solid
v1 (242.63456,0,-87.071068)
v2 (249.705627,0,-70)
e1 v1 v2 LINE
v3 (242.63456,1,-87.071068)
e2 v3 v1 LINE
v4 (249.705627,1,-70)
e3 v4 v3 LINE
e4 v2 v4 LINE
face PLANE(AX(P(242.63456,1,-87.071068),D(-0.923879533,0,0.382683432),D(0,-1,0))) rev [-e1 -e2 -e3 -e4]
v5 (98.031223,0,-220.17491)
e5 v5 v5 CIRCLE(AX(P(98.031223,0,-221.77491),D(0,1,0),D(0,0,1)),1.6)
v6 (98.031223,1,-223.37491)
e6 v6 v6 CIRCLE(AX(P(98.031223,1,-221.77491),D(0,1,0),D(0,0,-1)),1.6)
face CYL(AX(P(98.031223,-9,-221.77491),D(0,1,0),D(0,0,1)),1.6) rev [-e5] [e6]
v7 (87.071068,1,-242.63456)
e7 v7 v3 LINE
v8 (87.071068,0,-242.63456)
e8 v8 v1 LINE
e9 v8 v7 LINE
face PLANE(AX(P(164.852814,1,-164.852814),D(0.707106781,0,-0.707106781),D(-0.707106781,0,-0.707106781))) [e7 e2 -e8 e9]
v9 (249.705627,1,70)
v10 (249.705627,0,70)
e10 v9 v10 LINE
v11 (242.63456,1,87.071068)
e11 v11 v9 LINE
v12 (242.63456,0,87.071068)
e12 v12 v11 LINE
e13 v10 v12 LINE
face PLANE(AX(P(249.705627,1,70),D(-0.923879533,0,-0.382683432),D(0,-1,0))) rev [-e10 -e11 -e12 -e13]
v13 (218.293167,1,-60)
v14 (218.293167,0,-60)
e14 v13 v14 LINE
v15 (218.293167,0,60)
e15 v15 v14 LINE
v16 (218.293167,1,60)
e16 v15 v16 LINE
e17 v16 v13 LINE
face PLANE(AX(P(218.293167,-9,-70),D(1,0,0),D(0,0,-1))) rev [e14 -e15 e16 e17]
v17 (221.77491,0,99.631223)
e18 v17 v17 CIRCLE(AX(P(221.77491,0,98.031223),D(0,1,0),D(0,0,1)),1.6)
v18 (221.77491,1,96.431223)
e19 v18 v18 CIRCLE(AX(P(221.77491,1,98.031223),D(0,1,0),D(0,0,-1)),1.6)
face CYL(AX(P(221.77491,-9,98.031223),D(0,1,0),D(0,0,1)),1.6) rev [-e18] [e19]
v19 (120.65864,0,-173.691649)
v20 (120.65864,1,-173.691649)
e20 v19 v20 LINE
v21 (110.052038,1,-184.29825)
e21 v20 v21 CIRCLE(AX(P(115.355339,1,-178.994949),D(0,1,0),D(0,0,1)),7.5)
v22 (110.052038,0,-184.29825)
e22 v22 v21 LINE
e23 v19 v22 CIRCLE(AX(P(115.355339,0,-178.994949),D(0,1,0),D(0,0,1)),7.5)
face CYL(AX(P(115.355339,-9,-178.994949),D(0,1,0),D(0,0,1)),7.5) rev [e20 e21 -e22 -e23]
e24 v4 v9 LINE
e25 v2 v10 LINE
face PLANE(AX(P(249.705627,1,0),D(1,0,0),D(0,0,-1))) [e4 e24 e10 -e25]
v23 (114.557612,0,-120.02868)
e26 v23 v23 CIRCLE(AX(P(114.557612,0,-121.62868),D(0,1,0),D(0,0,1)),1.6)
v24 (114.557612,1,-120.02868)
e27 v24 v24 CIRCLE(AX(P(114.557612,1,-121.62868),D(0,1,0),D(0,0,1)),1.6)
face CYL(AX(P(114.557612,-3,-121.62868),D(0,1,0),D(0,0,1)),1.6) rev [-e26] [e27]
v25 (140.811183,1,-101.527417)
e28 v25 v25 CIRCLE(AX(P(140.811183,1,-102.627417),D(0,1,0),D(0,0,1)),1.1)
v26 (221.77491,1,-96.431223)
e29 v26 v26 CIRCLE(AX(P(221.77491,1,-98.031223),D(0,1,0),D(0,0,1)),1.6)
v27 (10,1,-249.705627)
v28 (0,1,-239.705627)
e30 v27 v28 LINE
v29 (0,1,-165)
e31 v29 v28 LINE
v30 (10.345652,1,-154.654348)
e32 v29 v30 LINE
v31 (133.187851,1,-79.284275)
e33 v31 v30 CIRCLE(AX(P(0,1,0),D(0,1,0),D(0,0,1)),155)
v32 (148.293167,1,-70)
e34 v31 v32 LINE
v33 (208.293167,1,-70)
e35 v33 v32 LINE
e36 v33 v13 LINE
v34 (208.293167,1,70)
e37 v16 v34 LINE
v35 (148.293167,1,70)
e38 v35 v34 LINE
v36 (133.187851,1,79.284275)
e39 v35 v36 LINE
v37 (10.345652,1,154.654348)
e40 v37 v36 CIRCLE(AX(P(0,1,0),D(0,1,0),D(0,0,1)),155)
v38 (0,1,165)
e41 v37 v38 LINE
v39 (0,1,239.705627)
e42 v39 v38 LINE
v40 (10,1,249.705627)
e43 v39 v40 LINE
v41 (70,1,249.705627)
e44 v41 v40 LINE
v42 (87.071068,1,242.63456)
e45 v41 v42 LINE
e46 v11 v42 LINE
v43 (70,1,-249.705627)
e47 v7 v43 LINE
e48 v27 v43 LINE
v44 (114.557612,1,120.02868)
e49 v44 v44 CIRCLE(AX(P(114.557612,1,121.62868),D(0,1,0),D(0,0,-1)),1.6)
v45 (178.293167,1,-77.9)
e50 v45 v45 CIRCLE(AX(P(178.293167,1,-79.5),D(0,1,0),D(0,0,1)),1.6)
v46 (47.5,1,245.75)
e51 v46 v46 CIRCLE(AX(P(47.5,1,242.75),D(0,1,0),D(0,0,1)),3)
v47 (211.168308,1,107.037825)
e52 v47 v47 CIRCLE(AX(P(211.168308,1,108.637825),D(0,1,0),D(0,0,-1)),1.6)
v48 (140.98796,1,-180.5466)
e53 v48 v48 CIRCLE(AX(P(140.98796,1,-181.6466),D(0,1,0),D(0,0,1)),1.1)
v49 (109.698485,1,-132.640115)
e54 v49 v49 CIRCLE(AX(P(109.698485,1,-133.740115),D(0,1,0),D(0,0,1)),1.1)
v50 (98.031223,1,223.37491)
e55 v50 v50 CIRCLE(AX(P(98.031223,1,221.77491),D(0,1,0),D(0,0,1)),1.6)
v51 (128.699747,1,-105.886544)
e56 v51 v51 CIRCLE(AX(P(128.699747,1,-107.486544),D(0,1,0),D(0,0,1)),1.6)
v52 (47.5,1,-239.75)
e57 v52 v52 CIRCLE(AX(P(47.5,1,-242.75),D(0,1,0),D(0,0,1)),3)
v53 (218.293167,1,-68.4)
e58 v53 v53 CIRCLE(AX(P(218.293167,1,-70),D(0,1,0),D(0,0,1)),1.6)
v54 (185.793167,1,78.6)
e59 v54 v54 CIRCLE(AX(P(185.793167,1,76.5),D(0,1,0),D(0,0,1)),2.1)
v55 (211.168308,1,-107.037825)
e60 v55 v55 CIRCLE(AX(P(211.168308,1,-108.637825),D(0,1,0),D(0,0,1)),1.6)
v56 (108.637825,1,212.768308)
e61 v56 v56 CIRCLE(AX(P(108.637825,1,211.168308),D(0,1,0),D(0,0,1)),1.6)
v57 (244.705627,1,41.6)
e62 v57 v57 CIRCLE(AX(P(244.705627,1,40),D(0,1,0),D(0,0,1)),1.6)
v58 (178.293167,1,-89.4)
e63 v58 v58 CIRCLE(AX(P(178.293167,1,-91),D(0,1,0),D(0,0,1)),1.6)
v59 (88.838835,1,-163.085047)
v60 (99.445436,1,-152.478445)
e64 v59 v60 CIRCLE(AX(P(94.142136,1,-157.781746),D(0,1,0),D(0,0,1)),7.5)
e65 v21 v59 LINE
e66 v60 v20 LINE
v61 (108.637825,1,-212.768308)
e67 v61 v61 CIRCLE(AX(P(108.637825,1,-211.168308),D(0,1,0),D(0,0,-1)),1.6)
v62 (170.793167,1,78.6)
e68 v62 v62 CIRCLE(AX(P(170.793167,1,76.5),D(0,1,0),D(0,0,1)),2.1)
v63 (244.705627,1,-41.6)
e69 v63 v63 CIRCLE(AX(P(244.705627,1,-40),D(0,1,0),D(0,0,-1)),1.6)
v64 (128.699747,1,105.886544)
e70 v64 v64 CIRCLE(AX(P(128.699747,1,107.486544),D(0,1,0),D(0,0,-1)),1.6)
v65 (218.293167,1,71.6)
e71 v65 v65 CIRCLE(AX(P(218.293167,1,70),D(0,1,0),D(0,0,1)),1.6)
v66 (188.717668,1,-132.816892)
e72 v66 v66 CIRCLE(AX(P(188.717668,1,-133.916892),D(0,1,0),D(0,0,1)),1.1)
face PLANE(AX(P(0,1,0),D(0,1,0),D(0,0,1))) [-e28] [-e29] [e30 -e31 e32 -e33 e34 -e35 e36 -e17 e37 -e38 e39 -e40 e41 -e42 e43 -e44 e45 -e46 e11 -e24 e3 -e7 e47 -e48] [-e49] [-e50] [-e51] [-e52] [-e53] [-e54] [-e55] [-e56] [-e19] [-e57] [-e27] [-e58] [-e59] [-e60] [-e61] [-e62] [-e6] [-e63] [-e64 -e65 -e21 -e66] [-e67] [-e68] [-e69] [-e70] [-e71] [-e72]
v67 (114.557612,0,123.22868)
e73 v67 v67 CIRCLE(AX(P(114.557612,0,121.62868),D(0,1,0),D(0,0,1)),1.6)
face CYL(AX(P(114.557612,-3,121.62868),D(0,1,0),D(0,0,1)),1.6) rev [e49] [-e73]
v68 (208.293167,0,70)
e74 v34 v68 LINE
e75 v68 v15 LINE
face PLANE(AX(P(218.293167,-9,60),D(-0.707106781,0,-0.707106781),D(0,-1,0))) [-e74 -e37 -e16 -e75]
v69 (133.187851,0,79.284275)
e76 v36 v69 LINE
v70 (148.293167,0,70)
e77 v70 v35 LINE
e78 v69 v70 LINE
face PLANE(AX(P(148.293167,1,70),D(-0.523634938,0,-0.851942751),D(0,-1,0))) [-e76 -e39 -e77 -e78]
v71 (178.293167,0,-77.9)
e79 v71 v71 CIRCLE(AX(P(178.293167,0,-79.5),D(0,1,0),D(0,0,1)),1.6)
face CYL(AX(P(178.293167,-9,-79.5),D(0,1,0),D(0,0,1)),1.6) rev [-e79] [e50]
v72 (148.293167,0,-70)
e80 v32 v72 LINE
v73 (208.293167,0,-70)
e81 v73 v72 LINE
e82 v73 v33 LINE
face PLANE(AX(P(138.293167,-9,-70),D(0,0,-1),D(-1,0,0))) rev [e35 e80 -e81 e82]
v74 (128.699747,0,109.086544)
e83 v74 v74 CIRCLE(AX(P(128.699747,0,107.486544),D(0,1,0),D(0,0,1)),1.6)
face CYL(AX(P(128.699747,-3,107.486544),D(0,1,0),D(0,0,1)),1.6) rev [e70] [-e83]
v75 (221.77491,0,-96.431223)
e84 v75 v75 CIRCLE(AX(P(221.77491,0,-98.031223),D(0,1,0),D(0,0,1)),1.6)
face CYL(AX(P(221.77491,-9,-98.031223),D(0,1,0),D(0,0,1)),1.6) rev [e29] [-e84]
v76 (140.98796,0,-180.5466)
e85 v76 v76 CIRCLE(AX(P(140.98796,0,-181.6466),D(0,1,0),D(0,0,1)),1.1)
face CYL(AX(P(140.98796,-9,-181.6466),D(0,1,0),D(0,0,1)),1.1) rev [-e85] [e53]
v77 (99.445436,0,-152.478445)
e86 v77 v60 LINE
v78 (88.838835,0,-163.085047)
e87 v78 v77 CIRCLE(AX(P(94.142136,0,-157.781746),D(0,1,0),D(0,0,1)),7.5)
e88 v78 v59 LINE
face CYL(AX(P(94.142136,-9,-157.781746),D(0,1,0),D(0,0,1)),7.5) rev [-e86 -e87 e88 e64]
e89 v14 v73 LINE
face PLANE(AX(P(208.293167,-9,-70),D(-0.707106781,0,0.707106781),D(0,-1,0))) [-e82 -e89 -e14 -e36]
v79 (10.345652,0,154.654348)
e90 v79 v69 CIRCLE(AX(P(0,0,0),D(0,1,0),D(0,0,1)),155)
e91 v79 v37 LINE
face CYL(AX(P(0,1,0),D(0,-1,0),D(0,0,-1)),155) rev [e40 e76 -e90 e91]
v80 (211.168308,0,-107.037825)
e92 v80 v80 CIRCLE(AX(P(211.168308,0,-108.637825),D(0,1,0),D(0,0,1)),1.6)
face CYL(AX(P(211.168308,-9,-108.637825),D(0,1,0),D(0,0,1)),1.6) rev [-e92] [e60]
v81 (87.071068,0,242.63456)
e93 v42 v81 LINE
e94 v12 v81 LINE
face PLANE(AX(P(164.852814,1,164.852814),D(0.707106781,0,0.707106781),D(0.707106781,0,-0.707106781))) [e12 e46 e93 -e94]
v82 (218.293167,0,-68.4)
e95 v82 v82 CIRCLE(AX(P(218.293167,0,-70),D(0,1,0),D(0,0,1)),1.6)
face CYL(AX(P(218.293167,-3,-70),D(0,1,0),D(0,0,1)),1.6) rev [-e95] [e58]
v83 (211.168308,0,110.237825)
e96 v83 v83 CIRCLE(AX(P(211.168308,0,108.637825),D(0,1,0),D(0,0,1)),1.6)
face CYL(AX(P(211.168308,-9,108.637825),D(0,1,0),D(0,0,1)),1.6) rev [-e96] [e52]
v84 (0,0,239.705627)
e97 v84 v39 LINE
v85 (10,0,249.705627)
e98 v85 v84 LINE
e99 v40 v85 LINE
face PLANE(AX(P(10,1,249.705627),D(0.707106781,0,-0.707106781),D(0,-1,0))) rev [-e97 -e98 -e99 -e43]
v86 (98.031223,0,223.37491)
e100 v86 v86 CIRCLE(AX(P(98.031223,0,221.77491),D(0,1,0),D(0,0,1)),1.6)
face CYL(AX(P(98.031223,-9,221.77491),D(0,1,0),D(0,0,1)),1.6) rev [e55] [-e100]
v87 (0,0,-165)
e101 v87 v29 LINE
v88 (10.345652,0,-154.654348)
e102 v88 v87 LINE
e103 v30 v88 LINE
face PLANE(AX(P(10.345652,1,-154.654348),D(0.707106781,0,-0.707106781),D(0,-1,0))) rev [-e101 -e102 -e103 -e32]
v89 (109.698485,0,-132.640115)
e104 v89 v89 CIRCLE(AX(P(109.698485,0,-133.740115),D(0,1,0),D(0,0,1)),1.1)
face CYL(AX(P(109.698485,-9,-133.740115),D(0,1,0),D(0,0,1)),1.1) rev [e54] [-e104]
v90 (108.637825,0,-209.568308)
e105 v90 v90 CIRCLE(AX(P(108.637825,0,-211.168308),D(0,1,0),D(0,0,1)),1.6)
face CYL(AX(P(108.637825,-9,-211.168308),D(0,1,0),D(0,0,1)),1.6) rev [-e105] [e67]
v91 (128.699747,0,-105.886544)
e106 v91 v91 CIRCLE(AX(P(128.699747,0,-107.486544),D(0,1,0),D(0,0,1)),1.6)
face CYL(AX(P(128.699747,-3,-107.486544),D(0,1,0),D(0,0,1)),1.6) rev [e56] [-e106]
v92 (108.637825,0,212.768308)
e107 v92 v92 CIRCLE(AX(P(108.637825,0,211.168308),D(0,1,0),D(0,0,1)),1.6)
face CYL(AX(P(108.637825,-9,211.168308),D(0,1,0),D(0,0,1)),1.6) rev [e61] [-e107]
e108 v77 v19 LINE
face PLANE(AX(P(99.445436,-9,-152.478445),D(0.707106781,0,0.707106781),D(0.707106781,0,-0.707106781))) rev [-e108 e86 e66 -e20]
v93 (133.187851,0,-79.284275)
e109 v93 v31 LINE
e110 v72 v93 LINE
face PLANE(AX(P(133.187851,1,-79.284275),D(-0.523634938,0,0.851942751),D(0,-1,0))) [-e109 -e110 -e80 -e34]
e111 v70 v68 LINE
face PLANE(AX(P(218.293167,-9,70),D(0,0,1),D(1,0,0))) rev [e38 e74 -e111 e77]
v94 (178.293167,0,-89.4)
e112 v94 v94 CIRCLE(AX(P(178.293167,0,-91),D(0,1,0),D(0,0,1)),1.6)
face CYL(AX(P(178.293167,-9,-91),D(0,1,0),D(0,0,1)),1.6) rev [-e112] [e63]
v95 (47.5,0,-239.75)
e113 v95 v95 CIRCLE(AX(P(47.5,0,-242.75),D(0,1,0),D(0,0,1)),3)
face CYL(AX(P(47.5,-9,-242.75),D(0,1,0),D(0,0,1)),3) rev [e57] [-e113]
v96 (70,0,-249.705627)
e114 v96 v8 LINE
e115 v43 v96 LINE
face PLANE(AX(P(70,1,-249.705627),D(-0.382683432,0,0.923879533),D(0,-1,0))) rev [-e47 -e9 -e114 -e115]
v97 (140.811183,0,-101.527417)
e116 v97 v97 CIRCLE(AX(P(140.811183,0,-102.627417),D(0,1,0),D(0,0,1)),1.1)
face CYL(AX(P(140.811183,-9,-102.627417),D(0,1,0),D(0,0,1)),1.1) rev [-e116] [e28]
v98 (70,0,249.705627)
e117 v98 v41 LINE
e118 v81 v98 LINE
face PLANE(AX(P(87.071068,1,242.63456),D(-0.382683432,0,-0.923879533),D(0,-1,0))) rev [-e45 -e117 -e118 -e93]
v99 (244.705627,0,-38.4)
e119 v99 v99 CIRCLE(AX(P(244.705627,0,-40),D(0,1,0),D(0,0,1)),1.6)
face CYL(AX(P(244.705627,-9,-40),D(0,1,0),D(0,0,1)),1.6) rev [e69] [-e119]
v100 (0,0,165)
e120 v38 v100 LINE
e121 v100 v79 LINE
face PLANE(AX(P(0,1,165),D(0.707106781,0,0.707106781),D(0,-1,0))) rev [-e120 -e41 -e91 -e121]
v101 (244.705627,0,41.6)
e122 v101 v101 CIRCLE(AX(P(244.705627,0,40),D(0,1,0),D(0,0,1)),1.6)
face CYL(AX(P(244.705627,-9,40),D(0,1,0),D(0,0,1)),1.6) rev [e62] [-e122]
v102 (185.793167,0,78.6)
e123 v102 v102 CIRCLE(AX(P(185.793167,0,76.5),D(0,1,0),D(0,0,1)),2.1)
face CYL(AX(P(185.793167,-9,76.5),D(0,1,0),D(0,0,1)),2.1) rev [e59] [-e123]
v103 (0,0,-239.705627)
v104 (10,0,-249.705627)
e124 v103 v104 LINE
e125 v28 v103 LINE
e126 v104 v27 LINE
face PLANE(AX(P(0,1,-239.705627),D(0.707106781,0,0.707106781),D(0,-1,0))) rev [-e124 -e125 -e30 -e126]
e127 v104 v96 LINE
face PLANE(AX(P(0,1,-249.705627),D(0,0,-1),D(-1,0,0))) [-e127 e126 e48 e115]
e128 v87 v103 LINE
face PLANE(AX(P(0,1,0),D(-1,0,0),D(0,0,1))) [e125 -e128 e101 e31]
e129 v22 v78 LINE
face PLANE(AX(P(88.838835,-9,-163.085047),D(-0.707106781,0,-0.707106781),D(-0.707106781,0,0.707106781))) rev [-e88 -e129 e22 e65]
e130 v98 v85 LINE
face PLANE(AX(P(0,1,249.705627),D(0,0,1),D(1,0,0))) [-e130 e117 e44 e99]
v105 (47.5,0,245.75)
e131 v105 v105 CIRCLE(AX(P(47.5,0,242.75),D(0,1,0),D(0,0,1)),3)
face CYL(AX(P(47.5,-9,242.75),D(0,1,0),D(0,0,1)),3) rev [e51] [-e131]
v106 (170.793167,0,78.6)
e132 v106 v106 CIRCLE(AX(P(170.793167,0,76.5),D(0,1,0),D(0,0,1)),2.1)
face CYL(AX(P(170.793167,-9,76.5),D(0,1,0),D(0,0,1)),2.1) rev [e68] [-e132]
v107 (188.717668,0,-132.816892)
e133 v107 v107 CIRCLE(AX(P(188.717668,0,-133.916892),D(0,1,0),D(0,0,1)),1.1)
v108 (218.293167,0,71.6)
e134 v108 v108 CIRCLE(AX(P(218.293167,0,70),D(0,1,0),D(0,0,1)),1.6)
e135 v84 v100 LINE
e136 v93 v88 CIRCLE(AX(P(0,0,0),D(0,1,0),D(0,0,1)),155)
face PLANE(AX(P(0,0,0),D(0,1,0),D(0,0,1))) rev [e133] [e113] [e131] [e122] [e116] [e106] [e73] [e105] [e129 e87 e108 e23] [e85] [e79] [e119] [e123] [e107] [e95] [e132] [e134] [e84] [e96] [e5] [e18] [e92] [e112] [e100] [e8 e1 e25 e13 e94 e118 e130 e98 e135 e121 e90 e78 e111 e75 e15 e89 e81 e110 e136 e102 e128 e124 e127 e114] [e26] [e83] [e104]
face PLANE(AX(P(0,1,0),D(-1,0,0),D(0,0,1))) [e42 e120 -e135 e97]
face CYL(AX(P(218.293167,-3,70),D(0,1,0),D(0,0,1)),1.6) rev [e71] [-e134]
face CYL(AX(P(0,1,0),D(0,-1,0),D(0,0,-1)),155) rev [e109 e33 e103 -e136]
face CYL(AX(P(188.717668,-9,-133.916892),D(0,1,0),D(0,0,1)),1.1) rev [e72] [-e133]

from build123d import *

# Parameters (mm, degrees)
EXTRUDE_1_DEPTH     = 1
SKETCH_2_W          = 80
SKETCH_2_H          = 140
CUT_EXTRUDE_1_DEPTH = 10
CHAMFER_1_SIZE      = 10
SKETCH_3_R          = 1.6
CUT_EXTRUDE_2_DEPTH = 10
SKETCH_4_R          = 2.1
SKETCH_4_R_2        = 1.6
CUT_EXTRUDE_3_DEPTH = 10
SKETCH_5_R          = 3
CUT_EXTRUDE_4_DEPTH = 10
SKETCH_6_R          = 1.6
CUT_EXTRUDE_5_DEPTH = 4
SKETCH_7_R          = 1.6
CUT_EXTRUDE_6_DEPTH = 4
SKETCH_9_R          = 1.1
CUT_EXTRUDE_7_DEPTH = 10


with BuildPart() as part:
    # 草图1 → 凸台-拉伸1 (new body)
    with BuildSketch(Plane(origin=(0, 0, 0), x_dir=(1, 0, 0), z_dir=(0, 1, 0))):
        with BuildLine():
            Line((0, 249.705627485), (0, 155))
            ThreePointArc((0, 155), (109.601551084, 109.601551084), (155, 0))
            ThreePointArc((155, 0), (109.601551084, -109.601551084), (0, -155))
            Line((0, -155), (0, -249.705627485))
            Line((0, -249.705627485), (80, -249.705627485))
            Line((80, -249.705627485), (249.705627485, -80))
            Line((249.705627485, -80), (249.705627485, 0))
            Line((249.705627485, 0), (249.705627485, 80))
            Line((249.705627485, 80), (80, 249.705627485))
            Line((80, 249.705627485), (0, 249.705627485))
        make_face()
    extrude(amount=EXTRUDE_1_DEPTH)

    # 草图2 → 切除-拉伸1 (cut)
    with BuildSketch(Plane(origin=(0, 1, 0), x_dir=(1, 0, 0), z_dir=(0, 1, 0))):
        with Locations((178.293166859, 0)):
            Rectangle(SKETCH_2_W, SKETCH_2_H)
    extrude(amount=-CUT_EXTRUDE_1_DEPTH, mode=Mode.SUBTRACT)

    # 倒角1
    # the kernel refuses this chamfer: 10 mm, written as the material it adds along each edge
    with BuildSketch(Plane(origin=(218.293166859, 1, -70), x_dir=(0, 0, 1), z_dir=(0, -1, 0)), Plane(origin=(218.293166859, 1, 70), x_dir=(-1, 0, 0), z_dir=(0, -1, 0))) as chamfer_1_piece_1:
        Polygon((CHAMFER_1_SIZE, 0), (0, CHAMFER_1_SIZE), (0, 0), align=None)
    extrude(amount=1)
    # the kernel refuses this chamfer: 10 mm, written as the material it takes off along each edge
    with BuildSketch(Plane(origin=(0, -26.617651024, -155), x_dir=(0.9994423420060535, 0, 0.0333916906648138), z_dir=(0, 1, 0))) as chamfer_1_2_piece_1:
        with BuildLine():
            Line((10.351424106, 0), (-CHAMFER_1_SIZE * 0.0333916906648, CHAMFER_1_SIZE * 0.999442342006))
            Line((-CHAMFER_1_SIZE * 0.0333916906648, CHAMFER_1_SIZE * 0.999442342006), (0, 0))
            ThreePointArc((0, 0), (5.321987279, 0.086367968), (10.351424106, 0))
        make_face()
    extrude(amount=54.235302047, mode=Mode.SUBTRACT)
    with BuildSketch(Plane(origin=(0, -25.71682988, -249.705627485), x_dir=(0, 0, 1), z_dir=(0, 1, 0))) as chamfer_1_2_piece_2:
        Polygon((CHAMFER_1_SIZE, 0), (0, CHAMFER_1_SIZE), (0, 0), align=None)
    extrude(amount=52.433659759, mode=Mode.SUBTRACT)
    with BuildSketch(Plane(origin=(80, -25.926703929, -249.705627485), x_dir=(-1, 0, 0), z_dir=(0, 1, 0)), Plane(origin=(249.705627485, -25.926703929, -80), x_dir=(-0.7071067811865482, 0, -0.7071067811865468), z_dir=(0, 1, 0))) as chamfer_1_2_piece_3:
        Polygon((CHAMFER_1_SIZE, 0), (-CHAMFER_1_SIZE * 0.707106781187, CHAMFER_1_SIZE * 0.707106781187), (0, 0), align=None)
    extrude(amount=52.853407858, mode=Mode.SUBTRACT)
    with BuildSketch(Plane(origin=(249.705627485, -25.926703929, 80), x_dir=(-0.7071067811865481, 0, 0.7071067811865468), z_dir=(0, 1, 0)), Plane(origin=(80, -25.926703929, 249.705627485), x_dir=(-1, 0, 0), z_dir=(0, 1, 0))) as chamfer_1_2_piece_4:
        Polygon((CHAMFER_1_SIZE, 0), (-CHAMFER_1_SIZE * 0.707106781187, -CHAMFER_1_SIZE * 0.707106781187), (0, 0), align=None)
    extrude(amount=52.853407858, mode=Mode.SUBTRACT)
    with BuildSketch(Plane(origin=(0, -25.71682988, 249.705627485), x_dir=(0, 0, -1), z_dir=(0, 1, 0))) as chamfer_1_2_piece_5:
        Polygon((CHAMFER_1_SIZE, 0), (0, -CHAMFER_1_SIZE), (0, 0), align=None)
    extrude(amount=52.433659759, mode=Mode.SUBTRACT)
    with BuildSketch(Plane(origin=(0, -26.617651024, 155), x_dir=(0, 0, 1), z_dir=(0, 1, 0))) as chamfer_1_2_piece_6:
        with BuildLine():
            Line((CHAMFER_1_SIZE, 0), (-0.345651552, 10.345651552))
            ThreePointArc((-0.345651552, 10.345651552), (-0.091390348, 5.321903403), (0, 0))
            Line((0, 0), (CHAMFER_1_SIZE, 0))
        make_face()
    extrude(amount=54.235302047, mode=Mode.SUBTRACT)
    with BuildSketch(Plane(origin=(138.293166859, 28.362248577, -70), x_dir=(1, 0, 0), z_dir=(0, -1, 0))) as chamfer_1_2_piece_7:
        with BuildLine():
            Line((CHAMFER_1_SIZE, 0), (-5.105315746, -9.284275337))
            ThreePointArc((-5.105315746, -9.284275337), (-2.557269233, -4.838266251), (0, 0))
            Line((0, 0), (CHAMFER_1_SIZE, 0))
        make_face()
    extrude(amount=55.724497155, mode=Mode.SUBTRACT)
    with BuildSketch(Plane(origin=(138.293166859, 28.362248577, 70), x_dir=(-0.4818437006338934, 0, 0.8762571815166109), z_dir=(0, -1, 0))) as chamfer_1_2_piece_8:
        with BuildLine():
            Line((10.595377171, 0), (-CHAMFER_1_SIZE * 0.481843700634, -CHAMFER_1_SIZE * 0.876257181517))
            Line((-CHAMFER_1_SIZE * 0.481843700634, -CHAMFER_1_SIZE * 0.876257181517), (0, 0))
            ThreePointArc((0, 0), (5.471769619, -0.090462585), (10.595377171, 0))
        make_face()
    extrude(amount=55.724497155, mode=Mode.SUBTRACT)

    # 草图3 → 切除-拉伸2 (cut)
    with BuildSketch(Plane(origin=(0, 1, 0), x_dir=(1, 0, 0), z_dir=(0, 1, 0))):
        with Locations(Location((98.03122292, -221.774909628, 0), (0, 0, 270))):
            Circle(SKETCH_3_R)
        with Locations(Location((108.637824638, -211.16830791, 0), (0, 0, 270))):
            Circle(SKETCH_3_R)
        with Locations(Location((211.16830791, -108.637824638, 0), (0, 0, 270))):
            Circle(SKETCH_3_R)
        with Locations(Location((221.774909628, -98.03122292, 0), (0, 0, 270))):
            Circle(SKETCH_3_R)
        with Locations(Location((244.705627485, -40, 0), (0, 0, 270))):
            Circle(SKETCH_3_R)
        with Locations(Location((244.705627485, 40, 0), (0, 0, 270))):
            Circle(SKETCH_3_R)
        with Locations(Location((221.774909628, 98.03122292, 0), (0, 0, 270))):
            Circle(SKETCH_3_R)
        with Locations(Location((211.16830791, 108.637824638, 0), (0, 0, 270))):
            Circle(SKETCH_3_R)
        with Locations(Location((108.637824638, 211.16830791, 0), (0, 0, 270))):
            Circle(SKETCH_3_R)
        with Locations(Location((98.03122292, 221.774909628, 0), (0, 0, 270))):
            Circle(SKETCH_3_R)
    extrude(amount=-CUT_EXTRUDE_2_DEPTH, mode=Mode.SUBTRACT)

    # 草图4 → 切除-拉伸3 (cut)
    with BuildSketch(Plane(origin=(0, 1, 0), x_dir=(1, 0, 0), z_dir=(0, 1, 0))):
        with Locations(Location((170.793166859, -76.5, 0), (0, 0, 270))):
            Circle(SKETCH_4_R)
        with Locations(Location((185.793166859, -76.5, 0), (0, 0, 270))):
            Circle(SKETCH_4_R)
        with Locations(Location((178.293166859, 91, 0), (0, 0, 270))):
            Circle(SKETCH_4_R_2)
        with Locations(Location((178.293166859, 79.5, 0), (0, 0, 270))):
            Circle(SKETCH_4_R_2)
    extrude(amount=-CUT_EXTRUDE_3_DEPTH, mode=Mode.SUBTRACT)

    # 草图5 → 切除-拉伸4 (cut)
    with BuildSketch(Plane(origin=(0, 1, 0), x_dir=(1, 0, 0), z_dir=(0, 1, 0))):
        with Locations(Location((47.5, -242.75, 0), (0, 0, 270))):
            Circle(SKETCH_5_R)
        with Locations(Location((47.5, 242.75, 0), (0, 0, 270))):
            Circle(SKETCH_5_R)
    extrude(amount=-CUT_EXTRUDE_4_DEPTH, mode=Mode.SUBTRACT)

    # 草图6 → 切除-拉伸5 (cut)
    with BuildSketch(Plane(origin=(0, 1, 0), x_dir=(1, 0, 0), z_dir=(0, 1, 0))):
        with Locations(Location((128.699747468, 107.486544033, 0), (0, 0, 270))):
            Circle(SKETCH_6_R)
        with Locations(Location((114.557611845, 121.628679656, 0), (0, 0, 270))):
            Circle(SKETCH_6_R)
        with Locations(Location((128.699747468, -107.486544033, 0), (0, 0, 270))):
            Circle(SKETCH_6_R)
        with Locations(Location((114.557611845, -121.628679656, 0), (0, 0, 270))):
            Circle(SKETCH_6_R)
    extrude(amount=-CUT_EXTRUDE_5_DEPTH, mode=Mode.SUBTRACT)

    # 草图7 → 切除-拉伸6 (cut)
    with BuildSketch(Plane(origin=(0, 1, 0), x_dir=(1, 0, 0), z_dir=(0, 1, 0))):
        with Locations(Location((218.293166859, 70, 0), (0, 0, 270))):
            Circle(SKETCH_7_R)
        with Locations(Location((218.293166859, -70, 0), (0, 0, 270))):
            Circle(SKETCH_7_R)
    extrude(amount=-CUT_EXTRUDE_6_DEPTH, mode=Mode.SUBTRACT)

    # 草图9 → 切除-拉伸7 (cut)
    with BuildSketch(Plane(origin=(0, 1, 0), x_dir=(1, 0, 0), z_dir=(0, 1, 0))):
        with Locations(Location((188.717667607, 133.916892065, 0), (0, 0, 270))):
            Circle(SKETCH_9_R)
        with Locations(Location((140.987959877, 181.646599796, 0), (0, 0, 270))):
            Circle(SKETCH_9_R)
        with Locations(Location((109.69848481, 133.74011537, 0), (0, 0, 270))):
            Circle(SKETCH_9_R)
        with Locations(Location((140.811183182, 102.627416998, 0), (0, 0, 270))):
            Circle(SKETCH_9_R)
        with BuildLine():
            Line((88.838834765, 163.085046789), (110.0520382, 184.298250225))
            ThreePointArc((110.0520382, 184.298250225), (120.658639918, 184.298250225), (120.658639918, 173.691648507))
            Line((120.658639918, 173.691648507), (99.445436483, 152.478445072))
            ThreePointArc((99.445436483, 152.478445072), (88.838834765, 152.478445072), (88.838834765, 163.085046789))
        make_face()
    extrude(amount=-CUT_EXTRUDE_7_DEPTH, mode=Mode.SUBTRACT)


solid = part.part
